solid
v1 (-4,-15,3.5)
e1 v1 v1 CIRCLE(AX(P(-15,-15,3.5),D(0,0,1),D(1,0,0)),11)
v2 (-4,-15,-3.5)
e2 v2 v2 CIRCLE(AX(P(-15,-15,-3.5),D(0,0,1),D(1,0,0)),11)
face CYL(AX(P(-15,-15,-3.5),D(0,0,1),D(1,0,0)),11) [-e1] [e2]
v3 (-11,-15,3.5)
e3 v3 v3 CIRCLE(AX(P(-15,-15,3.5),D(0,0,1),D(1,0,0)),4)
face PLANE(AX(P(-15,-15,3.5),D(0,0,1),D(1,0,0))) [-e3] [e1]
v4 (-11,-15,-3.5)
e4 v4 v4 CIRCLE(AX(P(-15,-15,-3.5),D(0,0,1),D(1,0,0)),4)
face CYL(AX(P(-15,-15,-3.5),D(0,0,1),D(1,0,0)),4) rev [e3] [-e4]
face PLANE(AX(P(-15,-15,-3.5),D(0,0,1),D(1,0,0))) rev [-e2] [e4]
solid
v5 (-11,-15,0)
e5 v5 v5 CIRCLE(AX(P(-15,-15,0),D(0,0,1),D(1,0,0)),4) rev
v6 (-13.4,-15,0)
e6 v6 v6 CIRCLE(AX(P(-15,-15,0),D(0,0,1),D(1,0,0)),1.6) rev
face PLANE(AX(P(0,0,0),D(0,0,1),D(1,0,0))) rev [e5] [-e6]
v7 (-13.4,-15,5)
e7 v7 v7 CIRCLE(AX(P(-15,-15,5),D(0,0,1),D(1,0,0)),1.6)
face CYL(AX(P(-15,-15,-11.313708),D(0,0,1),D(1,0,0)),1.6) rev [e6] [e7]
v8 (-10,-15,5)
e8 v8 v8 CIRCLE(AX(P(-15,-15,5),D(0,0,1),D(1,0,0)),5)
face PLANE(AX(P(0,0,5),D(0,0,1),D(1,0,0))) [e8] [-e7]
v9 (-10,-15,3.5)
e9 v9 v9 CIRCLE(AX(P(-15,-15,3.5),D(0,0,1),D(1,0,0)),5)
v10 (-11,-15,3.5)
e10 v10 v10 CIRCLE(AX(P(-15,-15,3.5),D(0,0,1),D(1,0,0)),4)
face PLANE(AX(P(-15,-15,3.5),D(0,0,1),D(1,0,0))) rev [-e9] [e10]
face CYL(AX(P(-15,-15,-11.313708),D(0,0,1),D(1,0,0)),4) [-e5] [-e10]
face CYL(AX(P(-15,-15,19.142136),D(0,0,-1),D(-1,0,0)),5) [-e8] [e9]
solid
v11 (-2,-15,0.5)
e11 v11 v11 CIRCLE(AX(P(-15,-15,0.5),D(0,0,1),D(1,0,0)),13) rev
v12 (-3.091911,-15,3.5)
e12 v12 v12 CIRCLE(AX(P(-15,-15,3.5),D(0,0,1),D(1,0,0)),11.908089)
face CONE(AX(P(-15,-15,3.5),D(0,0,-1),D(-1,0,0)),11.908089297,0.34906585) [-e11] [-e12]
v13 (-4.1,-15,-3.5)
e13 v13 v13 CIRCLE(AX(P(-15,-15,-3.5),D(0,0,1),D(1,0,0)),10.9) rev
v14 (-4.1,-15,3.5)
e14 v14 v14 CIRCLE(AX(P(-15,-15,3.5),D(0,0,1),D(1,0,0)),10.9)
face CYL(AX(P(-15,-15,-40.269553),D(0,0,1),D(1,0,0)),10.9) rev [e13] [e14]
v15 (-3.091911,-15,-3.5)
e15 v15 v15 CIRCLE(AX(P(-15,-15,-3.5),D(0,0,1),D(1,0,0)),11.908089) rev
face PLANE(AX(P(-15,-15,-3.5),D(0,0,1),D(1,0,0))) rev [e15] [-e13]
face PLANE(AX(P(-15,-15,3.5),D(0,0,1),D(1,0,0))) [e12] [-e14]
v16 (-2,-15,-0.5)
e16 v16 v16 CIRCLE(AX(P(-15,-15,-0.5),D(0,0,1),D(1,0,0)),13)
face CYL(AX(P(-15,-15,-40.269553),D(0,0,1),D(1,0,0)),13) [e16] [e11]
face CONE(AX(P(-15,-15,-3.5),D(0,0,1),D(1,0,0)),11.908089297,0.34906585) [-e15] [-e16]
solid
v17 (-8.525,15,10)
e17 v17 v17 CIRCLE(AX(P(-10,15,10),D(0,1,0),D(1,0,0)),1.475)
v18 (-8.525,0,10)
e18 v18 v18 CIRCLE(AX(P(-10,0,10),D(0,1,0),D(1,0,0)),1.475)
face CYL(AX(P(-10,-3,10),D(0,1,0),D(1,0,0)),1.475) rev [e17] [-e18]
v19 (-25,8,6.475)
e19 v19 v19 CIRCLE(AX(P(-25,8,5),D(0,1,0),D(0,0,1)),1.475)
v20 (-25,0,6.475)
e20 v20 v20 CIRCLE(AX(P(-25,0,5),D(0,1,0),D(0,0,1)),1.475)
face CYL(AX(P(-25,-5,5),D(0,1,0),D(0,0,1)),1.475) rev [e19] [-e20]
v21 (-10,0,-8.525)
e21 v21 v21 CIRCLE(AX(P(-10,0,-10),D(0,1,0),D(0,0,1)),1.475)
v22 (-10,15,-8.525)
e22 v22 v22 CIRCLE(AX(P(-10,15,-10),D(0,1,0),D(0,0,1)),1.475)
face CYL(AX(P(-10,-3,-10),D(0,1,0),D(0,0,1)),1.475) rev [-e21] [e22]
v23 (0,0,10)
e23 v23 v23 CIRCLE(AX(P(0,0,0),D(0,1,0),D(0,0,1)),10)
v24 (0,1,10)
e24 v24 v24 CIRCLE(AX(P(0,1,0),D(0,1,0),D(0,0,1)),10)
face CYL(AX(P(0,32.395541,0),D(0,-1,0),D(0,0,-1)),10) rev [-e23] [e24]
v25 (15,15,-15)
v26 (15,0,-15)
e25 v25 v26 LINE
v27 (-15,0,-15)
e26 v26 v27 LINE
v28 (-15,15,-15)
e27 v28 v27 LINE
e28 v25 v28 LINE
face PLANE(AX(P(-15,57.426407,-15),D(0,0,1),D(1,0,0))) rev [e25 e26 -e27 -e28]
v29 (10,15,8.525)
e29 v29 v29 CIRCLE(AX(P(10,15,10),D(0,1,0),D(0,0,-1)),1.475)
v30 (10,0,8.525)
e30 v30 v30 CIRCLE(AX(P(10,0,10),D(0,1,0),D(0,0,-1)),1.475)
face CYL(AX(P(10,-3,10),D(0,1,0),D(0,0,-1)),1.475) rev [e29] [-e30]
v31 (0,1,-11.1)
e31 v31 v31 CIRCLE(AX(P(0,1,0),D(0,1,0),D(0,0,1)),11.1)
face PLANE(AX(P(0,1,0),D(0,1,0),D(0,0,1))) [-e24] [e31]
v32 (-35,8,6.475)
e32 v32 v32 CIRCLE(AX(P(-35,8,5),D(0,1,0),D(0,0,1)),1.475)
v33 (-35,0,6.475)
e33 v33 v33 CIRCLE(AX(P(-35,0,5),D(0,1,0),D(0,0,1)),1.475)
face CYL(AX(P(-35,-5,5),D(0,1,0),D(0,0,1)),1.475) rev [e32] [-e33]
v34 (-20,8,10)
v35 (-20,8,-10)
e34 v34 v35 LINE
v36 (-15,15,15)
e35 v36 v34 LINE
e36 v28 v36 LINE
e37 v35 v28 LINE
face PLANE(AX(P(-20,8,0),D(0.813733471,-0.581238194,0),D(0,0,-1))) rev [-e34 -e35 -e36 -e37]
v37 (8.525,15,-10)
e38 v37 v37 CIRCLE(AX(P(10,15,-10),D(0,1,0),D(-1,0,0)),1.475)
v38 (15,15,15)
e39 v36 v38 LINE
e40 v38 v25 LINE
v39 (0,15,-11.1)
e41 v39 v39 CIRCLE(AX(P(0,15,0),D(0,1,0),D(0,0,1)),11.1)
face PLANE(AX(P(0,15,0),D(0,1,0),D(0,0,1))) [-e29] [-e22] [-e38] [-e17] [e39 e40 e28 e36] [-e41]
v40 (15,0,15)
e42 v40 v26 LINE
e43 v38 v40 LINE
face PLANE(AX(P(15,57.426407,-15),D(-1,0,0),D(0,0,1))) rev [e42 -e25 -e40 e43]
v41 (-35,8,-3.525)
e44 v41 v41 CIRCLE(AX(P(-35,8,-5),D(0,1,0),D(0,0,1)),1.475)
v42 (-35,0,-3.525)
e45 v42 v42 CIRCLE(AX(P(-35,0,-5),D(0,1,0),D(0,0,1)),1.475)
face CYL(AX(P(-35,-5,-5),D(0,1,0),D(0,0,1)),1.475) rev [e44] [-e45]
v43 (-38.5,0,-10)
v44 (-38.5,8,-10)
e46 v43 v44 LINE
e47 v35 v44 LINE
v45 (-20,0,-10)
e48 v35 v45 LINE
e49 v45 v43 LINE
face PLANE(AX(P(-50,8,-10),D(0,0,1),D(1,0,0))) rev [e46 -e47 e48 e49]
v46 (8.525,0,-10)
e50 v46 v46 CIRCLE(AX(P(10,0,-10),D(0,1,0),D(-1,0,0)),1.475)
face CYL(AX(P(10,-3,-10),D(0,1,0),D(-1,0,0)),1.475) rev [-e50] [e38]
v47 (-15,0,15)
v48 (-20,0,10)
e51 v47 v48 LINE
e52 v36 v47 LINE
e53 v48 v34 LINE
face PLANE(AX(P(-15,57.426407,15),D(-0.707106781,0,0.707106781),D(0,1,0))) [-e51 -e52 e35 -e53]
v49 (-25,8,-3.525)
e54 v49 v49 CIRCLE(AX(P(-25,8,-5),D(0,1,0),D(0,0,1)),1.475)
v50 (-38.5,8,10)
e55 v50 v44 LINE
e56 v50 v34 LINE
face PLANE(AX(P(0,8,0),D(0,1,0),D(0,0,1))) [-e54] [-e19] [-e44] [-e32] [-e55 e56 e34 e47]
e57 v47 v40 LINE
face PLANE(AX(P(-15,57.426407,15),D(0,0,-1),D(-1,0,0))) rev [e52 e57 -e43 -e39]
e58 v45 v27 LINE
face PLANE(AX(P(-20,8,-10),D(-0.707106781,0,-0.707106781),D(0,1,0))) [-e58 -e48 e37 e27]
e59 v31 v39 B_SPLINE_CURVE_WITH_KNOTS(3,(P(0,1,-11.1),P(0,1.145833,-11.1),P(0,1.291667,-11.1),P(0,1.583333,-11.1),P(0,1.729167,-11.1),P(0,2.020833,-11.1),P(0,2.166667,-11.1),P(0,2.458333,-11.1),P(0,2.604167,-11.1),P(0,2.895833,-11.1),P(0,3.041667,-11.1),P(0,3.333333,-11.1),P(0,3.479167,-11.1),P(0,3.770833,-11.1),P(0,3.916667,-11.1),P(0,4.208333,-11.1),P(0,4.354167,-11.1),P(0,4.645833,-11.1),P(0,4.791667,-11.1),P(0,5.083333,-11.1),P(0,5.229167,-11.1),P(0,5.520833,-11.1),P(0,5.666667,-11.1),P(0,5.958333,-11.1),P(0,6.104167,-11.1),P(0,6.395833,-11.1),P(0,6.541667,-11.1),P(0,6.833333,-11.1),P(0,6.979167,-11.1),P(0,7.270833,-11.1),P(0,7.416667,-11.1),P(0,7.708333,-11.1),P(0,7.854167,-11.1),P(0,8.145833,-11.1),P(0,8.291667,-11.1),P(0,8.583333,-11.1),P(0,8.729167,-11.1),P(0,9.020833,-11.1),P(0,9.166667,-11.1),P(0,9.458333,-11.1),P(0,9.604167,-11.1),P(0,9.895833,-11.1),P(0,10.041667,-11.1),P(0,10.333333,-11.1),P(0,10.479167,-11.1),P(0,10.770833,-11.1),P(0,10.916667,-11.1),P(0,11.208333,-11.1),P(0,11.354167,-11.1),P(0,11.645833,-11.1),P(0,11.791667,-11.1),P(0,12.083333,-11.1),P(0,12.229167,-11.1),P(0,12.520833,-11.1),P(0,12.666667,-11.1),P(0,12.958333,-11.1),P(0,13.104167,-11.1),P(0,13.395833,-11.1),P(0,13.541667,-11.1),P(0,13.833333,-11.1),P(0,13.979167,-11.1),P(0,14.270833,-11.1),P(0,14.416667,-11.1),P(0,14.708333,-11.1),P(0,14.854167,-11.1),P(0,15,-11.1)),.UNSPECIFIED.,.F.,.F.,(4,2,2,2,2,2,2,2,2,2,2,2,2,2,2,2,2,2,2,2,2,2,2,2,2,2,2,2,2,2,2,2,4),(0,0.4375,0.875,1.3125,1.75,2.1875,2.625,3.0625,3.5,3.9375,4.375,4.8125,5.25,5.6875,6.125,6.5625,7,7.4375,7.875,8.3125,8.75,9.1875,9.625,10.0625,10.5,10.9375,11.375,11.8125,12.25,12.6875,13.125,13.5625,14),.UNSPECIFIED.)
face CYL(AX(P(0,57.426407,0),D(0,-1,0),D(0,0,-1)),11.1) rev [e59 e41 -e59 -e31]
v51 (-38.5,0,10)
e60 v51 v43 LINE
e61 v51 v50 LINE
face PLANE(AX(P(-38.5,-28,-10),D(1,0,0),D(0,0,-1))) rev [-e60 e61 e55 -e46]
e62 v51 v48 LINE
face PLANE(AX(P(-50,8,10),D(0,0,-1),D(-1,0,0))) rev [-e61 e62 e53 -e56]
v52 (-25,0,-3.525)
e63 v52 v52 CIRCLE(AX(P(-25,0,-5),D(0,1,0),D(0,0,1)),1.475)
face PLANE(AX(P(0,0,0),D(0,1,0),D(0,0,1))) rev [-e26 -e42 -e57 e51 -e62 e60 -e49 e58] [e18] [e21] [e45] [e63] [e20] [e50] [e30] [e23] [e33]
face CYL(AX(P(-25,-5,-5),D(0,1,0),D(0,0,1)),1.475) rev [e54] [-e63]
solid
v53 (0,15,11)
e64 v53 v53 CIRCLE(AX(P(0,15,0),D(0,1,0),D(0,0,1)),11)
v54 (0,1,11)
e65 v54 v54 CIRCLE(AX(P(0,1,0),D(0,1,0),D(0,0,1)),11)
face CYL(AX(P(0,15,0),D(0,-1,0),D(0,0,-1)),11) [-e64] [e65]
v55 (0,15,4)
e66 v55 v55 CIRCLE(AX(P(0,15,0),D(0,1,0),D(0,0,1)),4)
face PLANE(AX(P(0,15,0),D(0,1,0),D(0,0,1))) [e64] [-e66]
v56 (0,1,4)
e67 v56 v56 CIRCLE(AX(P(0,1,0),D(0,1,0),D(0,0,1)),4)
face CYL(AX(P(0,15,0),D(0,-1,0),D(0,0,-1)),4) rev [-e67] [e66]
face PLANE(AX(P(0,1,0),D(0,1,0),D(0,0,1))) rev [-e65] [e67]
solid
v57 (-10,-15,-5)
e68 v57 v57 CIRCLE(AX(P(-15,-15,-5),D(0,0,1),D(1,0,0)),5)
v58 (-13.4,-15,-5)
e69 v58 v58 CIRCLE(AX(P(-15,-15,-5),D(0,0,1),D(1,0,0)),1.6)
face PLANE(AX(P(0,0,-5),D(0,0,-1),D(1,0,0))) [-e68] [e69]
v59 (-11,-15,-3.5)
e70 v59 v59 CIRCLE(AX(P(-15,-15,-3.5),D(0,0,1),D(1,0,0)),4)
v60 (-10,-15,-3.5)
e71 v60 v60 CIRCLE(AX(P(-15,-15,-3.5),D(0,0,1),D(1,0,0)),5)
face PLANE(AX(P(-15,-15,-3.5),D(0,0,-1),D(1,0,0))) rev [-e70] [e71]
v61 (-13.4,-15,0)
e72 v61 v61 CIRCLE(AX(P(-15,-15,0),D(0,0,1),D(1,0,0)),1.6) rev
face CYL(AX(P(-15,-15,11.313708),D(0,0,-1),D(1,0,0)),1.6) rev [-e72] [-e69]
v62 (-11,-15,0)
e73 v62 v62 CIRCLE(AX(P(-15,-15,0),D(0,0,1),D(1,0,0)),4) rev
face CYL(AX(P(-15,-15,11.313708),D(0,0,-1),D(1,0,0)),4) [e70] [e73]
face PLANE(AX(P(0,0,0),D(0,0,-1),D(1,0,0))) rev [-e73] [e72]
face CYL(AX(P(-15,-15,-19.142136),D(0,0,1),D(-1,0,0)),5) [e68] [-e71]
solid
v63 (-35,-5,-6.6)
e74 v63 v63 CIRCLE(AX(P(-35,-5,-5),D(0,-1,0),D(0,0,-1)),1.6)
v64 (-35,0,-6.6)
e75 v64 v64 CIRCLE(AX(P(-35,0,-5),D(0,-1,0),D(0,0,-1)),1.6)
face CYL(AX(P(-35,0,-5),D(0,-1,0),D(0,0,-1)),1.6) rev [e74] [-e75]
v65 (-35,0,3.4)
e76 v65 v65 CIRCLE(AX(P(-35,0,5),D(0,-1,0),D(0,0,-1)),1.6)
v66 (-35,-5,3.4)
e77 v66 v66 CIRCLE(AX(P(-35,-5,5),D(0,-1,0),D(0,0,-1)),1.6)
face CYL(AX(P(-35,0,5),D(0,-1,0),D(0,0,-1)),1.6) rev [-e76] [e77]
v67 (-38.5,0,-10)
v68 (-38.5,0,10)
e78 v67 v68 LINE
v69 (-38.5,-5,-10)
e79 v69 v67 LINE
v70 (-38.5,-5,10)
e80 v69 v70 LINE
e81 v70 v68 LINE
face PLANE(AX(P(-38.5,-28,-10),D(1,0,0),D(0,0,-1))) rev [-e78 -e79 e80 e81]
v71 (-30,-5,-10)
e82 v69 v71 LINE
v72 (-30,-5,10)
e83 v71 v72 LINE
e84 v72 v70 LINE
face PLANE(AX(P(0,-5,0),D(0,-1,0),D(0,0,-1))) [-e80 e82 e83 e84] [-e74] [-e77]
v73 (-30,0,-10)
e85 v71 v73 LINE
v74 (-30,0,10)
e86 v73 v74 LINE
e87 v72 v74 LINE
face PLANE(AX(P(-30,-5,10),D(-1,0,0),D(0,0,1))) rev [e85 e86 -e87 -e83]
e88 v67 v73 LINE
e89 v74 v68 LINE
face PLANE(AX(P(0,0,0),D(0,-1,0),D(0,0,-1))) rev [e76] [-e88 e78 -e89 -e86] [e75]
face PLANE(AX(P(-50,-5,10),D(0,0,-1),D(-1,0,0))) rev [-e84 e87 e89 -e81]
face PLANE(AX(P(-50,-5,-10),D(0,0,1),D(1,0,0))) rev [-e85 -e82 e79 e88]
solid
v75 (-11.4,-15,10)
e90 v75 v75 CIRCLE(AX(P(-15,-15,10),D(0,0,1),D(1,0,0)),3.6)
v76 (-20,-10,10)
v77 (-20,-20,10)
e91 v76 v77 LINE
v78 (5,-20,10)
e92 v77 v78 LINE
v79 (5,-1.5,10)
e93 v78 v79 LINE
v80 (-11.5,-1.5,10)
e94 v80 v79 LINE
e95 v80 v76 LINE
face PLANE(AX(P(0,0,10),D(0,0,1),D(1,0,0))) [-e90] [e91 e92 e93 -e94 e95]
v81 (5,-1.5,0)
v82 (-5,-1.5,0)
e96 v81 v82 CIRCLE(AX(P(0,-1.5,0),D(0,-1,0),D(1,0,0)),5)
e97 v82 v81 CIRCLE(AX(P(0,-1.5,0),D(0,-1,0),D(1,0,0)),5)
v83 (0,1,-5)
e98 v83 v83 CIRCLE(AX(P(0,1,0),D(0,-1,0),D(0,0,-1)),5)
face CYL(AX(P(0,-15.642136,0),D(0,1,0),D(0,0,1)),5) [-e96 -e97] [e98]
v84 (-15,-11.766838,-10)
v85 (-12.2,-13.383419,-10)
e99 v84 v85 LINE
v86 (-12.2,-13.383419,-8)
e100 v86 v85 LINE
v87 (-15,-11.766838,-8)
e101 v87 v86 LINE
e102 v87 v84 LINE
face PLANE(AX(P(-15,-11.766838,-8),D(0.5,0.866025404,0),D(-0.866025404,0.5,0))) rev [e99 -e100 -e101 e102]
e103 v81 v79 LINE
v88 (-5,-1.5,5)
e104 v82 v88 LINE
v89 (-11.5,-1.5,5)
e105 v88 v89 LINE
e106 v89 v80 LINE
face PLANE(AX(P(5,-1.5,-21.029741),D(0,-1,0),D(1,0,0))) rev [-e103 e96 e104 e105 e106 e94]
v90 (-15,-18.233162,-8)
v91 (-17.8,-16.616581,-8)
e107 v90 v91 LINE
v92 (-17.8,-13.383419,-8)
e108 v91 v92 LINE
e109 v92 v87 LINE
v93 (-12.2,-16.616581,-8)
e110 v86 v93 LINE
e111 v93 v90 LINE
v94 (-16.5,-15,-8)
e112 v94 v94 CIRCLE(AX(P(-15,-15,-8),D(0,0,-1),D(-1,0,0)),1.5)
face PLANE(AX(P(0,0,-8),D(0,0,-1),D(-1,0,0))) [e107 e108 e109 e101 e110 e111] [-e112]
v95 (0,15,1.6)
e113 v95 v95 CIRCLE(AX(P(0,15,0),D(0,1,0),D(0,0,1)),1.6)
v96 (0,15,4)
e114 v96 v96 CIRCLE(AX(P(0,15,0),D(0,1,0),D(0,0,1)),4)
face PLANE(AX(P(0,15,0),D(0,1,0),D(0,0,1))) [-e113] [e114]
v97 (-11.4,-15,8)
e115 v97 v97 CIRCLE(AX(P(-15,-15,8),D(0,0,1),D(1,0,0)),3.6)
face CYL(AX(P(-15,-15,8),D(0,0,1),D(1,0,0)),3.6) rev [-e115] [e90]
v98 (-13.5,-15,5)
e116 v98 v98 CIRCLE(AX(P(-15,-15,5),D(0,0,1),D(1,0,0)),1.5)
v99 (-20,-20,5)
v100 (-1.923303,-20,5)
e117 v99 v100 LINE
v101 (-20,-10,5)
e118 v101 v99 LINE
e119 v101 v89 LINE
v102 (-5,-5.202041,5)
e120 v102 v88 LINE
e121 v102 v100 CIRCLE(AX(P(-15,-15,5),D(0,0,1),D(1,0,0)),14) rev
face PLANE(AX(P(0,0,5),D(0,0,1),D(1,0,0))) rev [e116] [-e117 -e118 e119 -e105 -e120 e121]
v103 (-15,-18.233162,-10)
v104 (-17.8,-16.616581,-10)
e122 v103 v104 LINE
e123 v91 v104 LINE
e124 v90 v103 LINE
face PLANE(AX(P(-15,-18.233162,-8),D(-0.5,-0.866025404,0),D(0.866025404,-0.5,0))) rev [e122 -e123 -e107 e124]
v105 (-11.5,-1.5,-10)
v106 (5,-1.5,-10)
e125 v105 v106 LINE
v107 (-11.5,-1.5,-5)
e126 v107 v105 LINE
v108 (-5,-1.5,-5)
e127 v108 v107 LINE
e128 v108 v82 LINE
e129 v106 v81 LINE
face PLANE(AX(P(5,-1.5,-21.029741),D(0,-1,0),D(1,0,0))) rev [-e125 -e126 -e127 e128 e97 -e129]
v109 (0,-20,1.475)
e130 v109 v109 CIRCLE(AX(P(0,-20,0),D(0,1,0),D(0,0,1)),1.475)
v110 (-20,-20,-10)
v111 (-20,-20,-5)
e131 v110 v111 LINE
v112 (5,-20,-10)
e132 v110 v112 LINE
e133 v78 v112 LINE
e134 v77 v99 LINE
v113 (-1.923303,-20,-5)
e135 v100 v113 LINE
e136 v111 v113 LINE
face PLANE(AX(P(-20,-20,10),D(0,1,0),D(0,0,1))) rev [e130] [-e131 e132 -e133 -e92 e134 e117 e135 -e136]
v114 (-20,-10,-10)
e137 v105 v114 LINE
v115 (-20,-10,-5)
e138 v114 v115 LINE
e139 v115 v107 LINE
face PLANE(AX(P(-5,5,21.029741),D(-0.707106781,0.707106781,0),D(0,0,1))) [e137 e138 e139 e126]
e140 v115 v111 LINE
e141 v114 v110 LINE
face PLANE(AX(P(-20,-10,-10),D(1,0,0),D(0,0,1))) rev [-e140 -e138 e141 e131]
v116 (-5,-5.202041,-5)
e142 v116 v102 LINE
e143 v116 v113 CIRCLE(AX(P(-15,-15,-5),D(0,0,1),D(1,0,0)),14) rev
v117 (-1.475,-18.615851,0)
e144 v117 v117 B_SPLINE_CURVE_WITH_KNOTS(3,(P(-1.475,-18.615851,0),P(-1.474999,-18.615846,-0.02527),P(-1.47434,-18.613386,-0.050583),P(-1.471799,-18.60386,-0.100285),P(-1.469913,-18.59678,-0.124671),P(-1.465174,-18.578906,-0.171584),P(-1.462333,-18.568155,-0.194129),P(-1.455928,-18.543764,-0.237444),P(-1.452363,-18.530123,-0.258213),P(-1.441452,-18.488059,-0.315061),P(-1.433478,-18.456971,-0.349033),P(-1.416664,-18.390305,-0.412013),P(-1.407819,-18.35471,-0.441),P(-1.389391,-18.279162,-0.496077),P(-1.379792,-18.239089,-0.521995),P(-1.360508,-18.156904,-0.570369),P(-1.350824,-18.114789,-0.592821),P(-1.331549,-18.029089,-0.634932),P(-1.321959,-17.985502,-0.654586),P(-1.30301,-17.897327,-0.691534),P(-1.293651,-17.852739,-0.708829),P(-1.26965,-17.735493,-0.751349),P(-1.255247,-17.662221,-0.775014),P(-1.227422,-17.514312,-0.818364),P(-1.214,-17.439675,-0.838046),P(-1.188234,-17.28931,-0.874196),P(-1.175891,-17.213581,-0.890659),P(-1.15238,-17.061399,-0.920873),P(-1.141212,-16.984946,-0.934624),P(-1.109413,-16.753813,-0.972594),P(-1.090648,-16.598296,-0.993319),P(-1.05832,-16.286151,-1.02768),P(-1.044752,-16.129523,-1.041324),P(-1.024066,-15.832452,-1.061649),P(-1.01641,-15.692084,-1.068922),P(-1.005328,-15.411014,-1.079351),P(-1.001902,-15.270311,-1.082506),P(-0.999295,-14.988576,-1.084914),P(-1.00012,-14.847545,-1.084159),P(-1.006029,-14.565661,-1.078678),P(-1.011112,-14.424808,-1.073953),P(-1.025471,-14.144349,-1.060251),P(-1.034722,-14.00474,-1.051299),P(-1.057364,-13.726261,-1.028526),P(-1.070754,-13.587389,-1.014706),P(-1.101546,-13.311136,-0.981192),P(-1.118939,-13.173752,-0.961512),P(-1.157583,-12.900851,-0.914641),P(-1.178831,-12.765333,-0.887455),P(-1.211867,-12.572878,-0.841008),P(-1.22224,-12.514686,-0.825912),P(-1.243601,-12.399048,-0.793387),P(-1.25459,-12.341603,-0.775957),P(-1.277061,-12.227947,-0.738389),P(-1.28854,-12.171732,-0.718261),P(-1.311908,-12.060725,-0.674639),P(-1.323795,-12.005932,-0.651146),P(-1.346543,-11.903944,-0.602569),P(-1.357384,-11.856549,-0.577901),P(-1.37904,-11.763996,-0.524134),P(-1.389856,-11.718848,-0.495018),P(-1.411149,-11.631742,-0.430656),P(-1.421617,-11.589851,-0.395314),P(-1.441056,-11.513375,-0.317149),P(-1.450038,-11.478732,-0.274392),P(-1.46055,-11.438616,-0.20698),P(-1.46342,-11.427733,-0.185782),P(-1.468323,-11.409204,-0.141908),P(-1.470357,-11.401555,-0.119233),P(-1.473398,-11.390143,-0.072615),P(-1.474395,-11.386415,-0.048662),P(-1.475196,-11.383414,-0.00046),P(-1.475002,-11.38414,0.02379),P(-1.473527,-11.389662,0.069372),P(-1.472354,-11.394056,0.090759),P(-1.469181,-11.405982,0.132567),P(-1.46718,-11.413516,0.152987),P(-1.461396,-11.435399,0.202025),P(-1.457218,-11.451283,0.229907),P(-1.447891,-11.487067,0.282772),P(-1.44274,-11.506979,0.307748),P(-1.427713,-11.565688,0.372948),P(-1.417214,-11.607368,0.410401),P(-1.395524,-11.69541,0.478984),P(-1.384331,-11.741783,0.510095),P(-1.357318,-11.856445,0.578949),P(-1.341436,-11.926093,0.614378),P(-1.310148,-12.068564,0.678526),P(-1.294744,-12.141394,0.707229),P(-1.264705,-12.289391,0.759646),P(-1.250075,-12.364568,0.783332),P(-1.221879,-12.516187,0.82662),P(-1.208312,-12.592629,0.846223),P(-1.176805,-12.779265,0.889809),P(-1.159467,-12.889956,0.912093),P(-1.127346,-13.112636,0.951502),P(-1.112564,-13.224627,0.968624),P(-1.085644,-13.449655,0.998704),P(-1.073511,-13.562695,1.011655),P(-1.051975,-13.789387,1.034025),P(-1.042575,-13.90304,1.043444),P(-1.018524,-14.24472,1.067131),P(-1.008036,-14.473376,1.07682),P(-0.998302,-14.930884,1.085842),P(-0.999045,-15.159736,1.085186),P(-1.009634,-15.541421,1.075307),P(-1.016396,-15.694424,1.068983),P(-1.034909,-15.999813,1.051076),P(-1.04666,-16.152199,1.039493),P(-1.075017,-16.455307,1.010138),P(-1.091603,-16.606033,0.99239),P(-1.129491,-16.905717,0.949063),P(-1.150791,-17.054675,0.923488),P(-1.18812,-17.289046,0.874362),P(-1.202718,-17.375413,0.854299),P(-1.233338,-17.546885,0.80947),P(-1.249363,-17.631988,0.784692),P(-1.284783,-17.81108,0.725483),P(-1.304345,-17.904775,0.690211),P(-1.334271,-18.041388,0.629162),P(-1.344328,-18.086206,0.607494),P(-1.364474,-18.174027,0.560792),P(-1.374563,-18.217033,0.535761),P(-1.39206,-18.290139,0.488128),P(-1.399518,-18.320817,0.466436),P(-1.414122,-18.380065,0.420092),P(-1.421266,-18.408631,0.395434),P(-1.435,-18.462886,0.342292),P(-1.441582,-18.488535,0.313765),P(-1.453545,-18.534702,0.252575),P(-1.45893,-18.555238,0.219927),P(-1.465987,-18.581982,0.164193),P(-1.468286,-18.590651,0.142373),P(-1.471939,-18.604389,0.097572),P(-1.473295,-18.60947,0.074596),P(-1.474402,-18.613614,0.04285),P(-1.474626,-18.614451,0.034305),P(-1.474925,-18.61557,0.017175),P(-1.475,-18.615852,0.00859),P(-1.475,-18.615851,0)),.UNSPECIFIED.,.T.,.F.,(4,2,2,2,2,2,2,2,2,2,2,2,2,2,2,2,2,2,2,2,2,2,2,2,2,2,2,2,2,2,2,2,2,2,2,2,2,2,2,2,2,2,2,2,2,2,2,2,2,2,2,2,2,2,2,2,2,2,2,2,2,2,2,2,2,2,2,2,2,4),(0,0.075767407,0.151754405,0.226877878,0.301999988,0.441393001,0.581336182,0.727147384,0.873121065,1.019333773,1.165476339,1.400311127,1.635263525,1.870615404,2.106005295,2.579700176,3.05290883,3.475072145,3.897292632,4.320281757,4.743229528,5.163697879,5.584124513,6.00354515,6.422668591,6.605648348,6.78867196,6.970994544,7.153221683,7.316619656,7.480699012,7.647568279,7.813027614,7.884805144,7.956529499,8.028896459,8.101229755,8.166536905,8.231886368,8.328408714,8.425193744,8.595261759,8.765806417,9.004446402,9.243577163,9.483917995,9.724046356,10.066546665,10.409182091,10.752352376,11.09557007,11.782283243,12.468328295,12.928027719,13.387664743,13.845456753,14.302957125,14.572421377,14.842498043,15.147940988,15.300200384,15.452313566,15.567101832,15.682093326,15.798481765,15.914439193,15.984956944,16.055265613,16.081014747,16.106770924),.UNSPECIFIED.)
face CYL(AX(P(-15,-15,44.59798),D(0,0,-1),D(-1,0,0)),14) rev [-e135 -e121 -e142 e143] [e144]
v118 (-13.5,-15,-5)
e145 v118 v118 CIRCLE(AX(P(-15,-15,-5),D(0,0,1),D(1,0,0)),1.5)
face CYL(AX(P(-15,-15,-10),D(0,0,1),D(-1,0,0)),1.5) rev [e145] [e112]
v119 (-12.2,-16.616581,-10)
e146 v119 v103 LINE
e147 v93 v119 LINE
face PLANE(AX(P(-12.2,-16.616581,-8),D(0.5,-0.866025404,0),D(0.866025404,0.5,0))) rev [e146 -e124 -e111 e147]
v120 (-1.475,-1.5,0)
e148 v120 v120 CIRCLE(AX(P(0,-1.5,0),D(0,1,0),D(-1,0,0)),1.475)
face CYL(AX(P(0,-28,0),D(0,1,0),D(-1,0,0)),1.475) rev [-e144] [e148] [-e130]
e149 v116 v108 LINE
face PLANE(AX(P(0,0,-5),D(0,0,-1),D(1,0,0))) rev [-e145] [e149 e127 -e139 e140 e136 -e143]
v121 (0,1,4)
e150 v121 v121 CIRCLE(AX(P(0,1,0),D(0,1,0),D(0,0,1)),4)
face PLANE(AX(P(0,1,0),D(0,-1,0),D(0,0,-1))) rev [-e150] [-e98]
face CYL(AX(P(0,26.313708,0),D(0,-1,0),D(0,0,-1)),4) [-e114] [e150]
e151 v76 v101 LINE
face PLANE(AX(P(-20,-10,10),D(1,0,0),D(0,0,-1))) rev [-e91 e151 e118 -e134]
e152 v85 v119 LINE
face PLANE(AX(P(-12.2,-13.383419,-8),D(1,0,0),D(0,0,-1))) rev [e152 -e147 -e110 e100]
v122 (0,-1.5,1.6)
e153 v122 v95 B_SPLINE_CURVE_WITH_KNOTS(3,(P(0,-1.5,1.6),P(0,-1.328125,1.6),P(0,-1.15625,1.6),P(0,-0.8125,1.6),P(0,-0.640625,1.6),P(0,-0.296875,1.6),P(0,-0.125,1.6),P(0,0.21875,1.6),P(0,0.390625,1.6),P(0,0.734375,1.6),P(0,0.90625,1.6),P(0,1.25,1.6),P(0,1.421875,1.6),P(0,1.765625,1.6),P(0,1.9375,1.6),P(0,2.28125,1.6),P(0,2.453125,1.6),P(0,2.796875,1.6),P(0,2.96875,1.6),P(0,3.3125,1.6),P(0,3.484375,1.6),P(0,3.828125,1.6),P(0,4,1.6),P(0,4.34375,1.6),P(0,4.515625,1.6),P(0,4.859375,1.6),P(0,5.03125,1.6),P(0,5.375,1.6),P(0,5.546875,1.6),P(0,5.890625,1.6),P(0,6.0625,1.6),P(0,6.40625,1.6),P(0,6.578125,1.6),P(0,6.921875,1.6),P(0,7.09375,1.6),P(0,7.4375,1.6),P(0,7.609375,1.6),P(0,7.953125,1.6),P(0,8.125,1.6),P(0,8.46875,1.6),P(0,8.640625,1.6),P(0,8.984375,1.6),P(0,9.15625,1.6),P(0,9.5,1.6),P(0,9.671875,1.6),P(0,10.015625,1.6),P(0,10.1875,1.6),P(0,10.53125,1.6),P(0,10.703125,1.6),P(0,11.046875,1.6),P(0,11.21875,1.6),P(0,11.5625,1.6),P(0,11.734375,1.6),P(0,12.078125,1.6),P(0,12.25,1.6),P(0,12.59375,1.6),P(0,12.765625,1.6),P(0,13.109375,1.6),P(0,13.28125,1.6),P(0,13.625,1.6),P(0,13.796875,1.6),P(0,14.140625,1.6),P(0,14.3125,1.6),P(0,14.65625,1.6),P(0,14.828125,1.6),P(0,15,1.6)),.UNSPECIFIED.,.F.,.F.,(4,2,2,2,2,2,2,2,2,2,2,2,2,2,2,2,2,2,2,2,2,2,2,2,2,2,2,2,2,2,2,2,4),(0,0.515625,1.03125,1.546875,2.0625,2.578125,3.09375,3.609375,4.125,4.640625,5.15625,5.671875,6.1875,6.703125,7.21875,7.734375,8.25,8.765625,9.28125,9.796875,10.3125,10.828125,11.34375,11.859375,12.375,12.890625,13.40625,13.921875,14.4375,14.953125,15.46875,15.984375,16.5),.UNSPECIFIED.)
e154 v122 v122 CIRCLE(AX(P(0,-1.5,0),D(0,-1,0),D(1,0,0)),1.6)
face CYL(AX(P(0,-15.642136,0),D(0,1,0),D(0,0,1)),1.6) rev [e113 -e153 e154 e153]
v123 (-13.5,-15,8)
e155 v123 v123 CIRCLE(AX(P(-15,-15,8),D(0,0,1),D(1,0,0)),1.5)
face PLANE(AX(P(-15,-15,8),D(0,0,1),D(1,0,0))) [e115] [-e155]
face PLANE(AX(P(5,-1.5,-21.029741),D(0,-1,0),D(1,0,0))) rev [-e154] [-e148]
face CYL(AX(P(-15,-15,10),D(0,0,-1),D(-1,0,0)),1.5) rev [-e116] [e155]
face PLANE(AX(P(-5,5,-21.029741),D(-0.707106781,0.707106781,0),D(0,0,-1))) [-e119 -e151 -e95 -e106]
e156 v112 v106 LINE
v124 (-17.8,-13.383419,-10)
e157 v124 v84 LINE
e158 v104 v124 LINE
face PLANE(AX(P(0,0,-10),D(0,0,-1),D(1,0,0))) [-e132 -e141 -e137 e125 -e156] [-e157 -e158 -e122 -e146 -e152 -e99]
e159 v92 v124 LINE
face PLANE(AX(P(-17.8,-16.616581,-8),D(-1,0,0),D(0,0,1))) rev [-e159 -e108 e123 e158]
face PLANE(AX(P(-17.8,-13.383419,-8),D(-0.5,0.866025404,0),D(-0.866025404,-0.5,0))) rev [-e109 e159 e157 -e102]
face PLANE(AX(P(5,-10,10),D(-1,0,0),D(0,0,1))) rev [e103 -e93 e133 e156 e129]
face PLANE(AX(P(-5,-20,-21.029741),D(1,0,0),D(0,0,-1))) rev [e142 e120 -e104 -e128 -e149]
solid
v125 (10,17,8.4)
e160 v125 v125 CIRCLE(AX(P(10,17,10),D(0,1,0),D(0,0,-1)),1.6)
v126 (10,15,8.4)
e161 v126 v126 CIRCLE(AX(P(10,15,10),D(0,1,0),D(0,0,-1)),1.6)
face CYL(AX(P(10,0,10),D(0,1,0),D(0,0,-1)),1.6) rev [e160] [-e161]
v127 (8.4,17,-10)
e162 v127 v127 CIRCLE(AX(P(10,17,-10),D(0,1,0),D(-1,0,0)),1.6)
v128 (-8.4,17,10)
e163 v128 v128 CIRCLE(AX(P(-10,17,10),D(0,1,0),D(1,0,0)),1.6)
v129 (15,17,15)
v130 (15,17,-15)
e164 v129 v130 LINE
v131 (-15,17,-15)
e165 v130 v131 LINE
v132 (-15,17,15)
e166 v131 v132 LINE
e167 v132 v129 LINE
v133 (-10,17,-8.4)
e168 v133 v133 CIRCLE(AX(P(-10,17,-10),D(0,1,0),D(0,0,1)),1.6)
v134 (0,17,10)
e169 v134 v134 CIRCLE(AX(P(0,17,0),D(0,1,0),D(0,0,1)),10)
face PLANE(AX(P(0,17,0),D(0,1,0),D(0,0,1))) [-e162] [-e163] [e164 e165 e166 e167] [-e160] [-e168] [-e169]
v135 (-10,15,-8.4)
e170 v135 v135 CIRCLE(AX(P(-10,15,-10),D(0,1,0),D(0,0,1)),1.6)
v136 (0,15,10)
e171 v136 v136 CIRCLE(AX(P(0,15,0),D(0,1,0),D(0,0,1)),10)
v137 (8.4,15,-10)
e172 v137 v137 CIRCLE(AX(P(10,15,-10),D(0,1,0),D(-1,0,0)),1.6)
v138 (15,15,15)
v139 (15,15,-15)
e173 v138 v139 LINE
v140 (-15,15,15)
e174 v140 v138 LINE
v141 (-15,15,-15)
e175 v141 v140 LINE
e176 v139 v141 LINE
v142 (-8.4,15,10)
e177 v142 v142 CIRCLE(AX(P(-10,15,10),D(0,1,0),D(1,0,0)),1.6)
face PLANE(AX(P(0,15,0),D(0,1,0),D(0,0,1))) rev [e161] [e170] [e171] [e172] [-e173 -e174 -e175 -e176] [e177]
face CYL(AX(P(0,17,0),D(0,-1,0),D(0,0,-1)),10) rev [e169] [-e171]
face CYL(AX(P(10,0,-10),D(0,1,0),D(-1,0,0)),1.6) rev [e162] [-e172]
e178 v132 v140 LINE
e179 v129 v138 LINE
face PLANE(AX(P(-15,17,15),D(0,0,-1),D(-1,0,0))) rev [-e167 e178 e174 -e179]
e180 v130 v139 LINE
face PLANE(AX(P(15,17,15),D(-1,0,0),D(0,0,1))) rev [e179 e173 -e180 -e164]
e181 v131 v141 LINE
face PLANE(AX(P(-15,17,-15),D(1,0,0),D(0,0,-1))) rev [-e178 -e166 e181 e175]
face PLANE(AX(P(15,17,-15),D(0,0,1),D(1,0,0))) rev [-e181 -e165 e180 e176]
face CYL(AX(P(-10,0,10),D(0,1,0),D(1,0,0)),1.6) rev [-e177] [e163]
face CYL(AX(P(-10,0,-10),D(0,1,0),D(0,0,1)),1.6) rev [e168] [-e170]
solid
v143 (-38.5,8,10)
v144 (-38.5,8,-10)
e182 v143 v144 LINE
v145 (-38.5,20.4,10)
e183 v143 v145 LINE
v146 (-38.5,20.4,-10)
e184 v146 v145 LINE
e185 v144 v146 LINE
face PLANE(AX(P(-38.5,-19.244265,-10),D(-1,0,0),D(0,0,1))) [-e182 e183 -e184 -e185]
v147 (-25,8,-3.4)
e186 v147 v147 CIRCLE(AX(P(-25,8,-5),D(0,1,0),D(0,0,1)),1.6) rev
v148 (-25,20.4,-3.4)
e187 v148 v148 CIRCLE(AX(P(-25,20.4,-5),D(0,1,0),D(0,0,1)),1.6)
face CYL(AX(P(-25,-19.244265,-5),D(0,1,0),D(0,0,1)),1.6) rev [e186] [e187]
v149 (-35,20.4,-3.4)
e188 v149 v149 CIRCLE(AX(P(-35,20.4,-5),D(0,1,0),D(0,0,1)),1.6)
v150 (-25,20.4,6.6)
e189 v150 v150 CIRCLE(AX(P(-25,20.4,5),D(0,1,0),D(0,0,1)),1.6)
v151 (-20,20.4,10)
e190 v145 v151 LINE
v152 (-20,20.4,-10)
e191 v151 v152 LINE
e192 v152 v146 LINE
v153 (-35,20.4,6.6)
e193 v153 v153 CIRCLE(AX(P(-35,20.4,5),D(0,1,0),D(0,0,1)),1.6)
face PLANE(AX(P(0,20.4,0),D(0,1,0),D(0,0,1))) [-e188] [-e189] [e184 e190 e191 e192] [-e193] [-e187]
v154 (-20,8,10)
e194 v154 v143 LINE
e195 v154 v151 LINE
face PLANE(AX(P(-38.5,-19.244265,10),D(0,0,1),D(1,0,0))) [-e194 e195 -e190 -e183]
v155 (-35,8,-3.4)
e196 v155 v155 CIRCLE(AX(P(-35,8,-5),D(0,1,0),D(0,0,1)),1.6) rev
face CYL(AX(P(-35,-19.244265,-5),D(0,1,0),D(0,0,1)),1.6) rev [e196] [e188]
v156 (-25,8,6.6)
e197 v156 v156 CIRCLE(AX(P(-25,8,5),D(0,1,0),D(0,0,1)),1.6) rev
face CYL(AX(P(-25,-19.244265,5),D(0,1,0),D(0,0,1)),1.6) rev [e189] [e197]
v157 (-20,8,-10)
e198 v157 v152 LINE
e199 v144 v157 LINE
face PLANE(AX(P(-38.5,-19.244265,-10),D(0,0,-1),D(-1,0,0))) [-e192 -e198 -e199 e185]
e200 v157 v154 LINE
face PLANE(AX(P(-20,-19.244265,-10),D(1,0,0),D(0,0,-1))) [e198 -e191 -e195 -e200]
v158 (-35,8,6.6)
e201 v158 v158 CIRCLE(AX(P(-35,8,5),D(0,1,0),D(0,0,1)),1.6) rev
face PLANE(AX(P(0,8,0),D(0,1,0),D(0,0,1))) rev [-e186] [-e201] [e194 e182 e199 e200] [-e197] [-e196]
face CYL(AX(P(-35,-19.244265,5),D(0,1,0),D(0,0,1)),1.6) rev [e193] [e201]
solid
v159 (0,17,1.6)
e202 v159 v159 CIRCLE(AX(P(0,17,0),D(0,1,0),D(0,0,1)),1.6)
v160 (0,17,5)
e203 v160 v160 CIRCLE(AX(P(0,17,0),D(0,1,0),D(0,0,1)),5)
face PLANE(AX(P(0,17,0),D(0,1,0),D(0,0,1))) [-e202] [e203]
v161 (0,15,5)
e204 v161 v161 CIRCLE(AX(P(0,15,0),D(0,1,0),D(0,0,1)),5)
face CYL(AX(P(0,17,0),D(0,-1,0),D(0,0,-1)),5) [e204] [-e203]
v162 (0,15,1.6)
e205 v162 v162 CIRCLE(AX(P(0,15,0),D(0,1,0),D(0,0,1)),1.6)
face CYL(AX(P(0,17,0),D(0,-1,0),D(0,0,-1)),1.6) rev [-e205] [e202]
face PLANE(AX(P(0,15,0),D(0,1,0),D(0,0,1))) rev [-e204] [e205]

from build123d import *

# Parameters (mm, degrees)
BOSS_EXTRUDE1_START       = 1
SKETCH1_R                 = 11
SKETCH1_R_2               = 4
BOSS_EXTRUDE1_DEPTH       = 14
SKETCH2_W                 = 30
SKETCH2_H                 = 30
SKETCH2_R                 = 11.1
BOSS_EXTRUDE2_DEPTH       = 15
SKETCH22_R                = 11.1
SKETCH22_R_2              = 10
BOSS_EXTRUDE14_DEPTH      = 1
SKETCH23_W                = 30
SKETCH23_H                = 30
SKETCH23_R                = 10
BOSS_EXTRUDE15_DEPTH      = 2
SKETCH24_R                = 1.475
CUT_EXTRUDE7_DEPTH        = 20
SKETCH25_R                = 1.6
CUT_EXTRUDE8_DEPTH        = 28.184554438
CIRPATTERN1_OUTLINE_R     = 1.475
CIRPATTERN1_DEPTH         = 17
CIRPATTERN1_START         = 15
CIRPATTERN1_2_OUTLINE_R   = 1.6
CIRPATTERN1_2_OUTLINE_R_2 = 1.475
CIRPATTERN1_2_DEPTH       = 2
SKETCH4_W                 = 35
SKETCH4_H                 = 20
BOSS_EXTRUDE4_DEPTH       = 8
SKETCH28_W                = 20
SKETCH28_H                = 20
BOSS_EXTRUDE16_DEPTH      = 5
SKETCH19_R                = 1.475
CUT_EXTRUDE5_DEPTH        = 54.795910625
SKETCH30_R                = 1.6
CUT_EXTRUDE11_DEPTH       = 5
LPATTERN1_COUNT           = 3
LPATTERN1_PITCH           = 10
LPATTERN1_COUNT_DIR2      = 2
LPATTERN1_PITCH_DIR2      = 10
LPATTERN2_COUNT           = 2
LPATTERN2_PITCH           = 10
LPATTERN2_COUNT_DIR2      = 2
LPATTERN2_PITCH_DIR2      = 10
CHAMFER4_SIZE             = 5
CHAMFER5_SIZE2            = 5
CHAMFER5_SIZE             = 7
BOSS_EXTRUDE8_START       = 1
SKETCH9_R                 = 4
SKETCH9_R_2               = 1.6
BOSS_EXTRUDE8_DEPTH       = 14
BOSS_EXTRUDE5_DEPTH       = 3.5
BOSS_EXTRUDE5_DEPTH_BACK  = 3.5
SKETCH5_R                 = 11
SKETCH5_R_2               = 4
SKETCH6_R                 = 13
SKETCH6_R_2               = 10.9
BOSS_EXTRUDE6_DEPTH       = 7
CHAMFER1_SIZE             = 3
CHAMFER1_SIZE2            = 1.091910703
SKETCH7_R                 = 4
SKETCH7_R_2               = 1.6
BOSS_EXTRUDE7_DEPTH       = 3.5
BOSS_EXTRUDE9_START       = 5
SKETCH10_W                = 25
SKETCH10_H                = 10
SKETCH10_R                = 1.5
BOSS_EXTRUDE9_DEPTH       = 5
SKETCH12_R                = 5
SKETCH12_R_2              = 1.6
BOSS_EXTRUDE10_DEPTH      = 1.5
BOSS_EXTRUDE11_DEPTH      = 5
BOSS_EXTRUDE11_DEPTH_BACK = 5
SKETCH13_W                = 10
SKETCH13_H                = 18.5
CHAMFER2_SIZE             = 15
SKETCH14_R                = 14
CUT_EXTRUDE1_DEPTH        = 5
SKETCH16_R                = 1.475
CUT_EXTRUDE2_DEPTH        = 59.542719445
SKETCH15_R                = 5
SKETCH15_R_2              = 1.6
BOSS_EXTRUDE12_DEPTH      = 2.5
SKETCH17_R                = 3.6
CUT_EXTRUDE3_DEPTH        = 2
CUT_EXTRUDE4_DEPTH        = 2
SKETCH21_R                = 5
SKETCH21_R_2              = 1.6
BOSS_EXTRUDE13_DEPTH      = 2
SKETCH29_W                = 10
SKETCH29_H                = 20
CUT_EXTRUDE10_DEPTH       = 64.41135545
SKETCH31_W                = 1.5
SKETCH31_H                = 20
CUT_EXTRUDE12_DEPTH       = 61.613529843
BOSS_EXTRUDE17_DEPTH      = 5.4
BOSS_EXTRUDE17_DEPTH_BACK = 7
SKETCH32_W                = 18.5
SKETCH32_H                = 20
SKETCH32_R                = 1.6


# Read off the part's stored shape, not the designer's step: CirPattern1
# Some blends are built 0.0001 mm under size
with BuildPart() as part:
    # Sketch1 → Boss-Extrude1 (new body)
    with BuildSketch(Plane(origin=(0, 0, 0), x_dir=(1, 0, 0), z_dir=(0, 1, 0)).offset(BOSS_EXTRUDE1_START)):
        with Locations(Location((0, 0, 0), (0, 0, 270))):
            Circle(SKETCH1_R)
        with Locations(Location((0, 0, 0), (0, 0, 270))):
            Circle(SKETCH1_R_2, mode=Mode.SUBTRACT)
    extrude(amount=BOSS_EXTRUDE1_DEPTH)


with BuildPart() as body_2:
    # Sketch2 → Boss-Extrude2 (new body)
    with BuildSketch(Plane(origin=(0, 0, 0), x_dir=(1, 0, 0), z_dir=(0, 1, 0))):
        Rectangle(SKETCH2_W, SKETCH2_H)
        with Locations(Location((0, 0, 0), (0, 0, 90))):
            Circle(SKETCH2_R, mode=Mode.SUBTRACT)
    extrude(amount=BOSS_EXTRUDE2_DEPTH)

    # Sketch22 → Boss-Extrude14 (add)
    with BuildSketch(Plane(origin=(0, 0, 0), x_dir=(1, 0, 0), z_dir=(0, 1, 0))):
        with Locations(Location((0, 0, 0), (0, 0, 90))):
            Circle(SKETCH22_R)
        with Locations(Location((0, 0, 0), (0, 0, 270))):
            Circle(SKETCH22_R_2, mode=Mode.SUBTRACT)
    extrude(amount=BOSS_EXTRUDE14_DEPTH)


with BuildPart() as body_3:
    # Sketch23 → Boss-Extrude15 (new body)
    with BuildSketch(Plane(origin=(0, 15, 0), x_dir=(1, 0, 0), z_dir=(0, 1, 0))):
        Rectangle(SKETCH23_W, SKETCH23_H)
        with Locations(Location((0, 0, 0), (0, 0, 270))):
            Circle(SKETCH23_R, mode=Mode.SUBTRACT)
    extrude(amount=BOSS_EXTRUDE15_DEPTH)


with BuildPart() as cut_extrude7_tool:
    # Sketch24 → Cut-Extrude7 (new body)
    with BuildSketch(Plane(origin=(0, 17, 0), x_dir=(1, 0, 0), z_dir=(0, 1, 0))):
        with Locations(Location((-10, 10, 0), (0, 0, 270))):
            Circle(SKETCH24_R)
    extrude(amount=-CUT_EXTRUDE7_DEPTH)


with BuildPart() as body_2_1:
    add(body_2.part)

    # Cut-Extrude7: cut by cut_extrude7_tool
    add(cut_extrude7_tool.part, mode=Mode.SUBTRACT)


with BuildPart() as body_3_1:
    add(body_3.part)

    # Cut-Extrude7: cut by cut_extrude7_tool
    add(cut_extrude7_tool.part, mode=Mode.SUBTRACT)

    # Sketch25 → Cut-Extrude8 (cut, through all)
    with BuildSketch(Plane(origin=(0, 17, 0), x_dir=(1, 0, 0), z_dir=(0, 1, 0))):
        with Locations(Location((-10, 10, 0), (0, 0, 270))):
            Circle(SKETCH25_R)
    extrude(amount=-CUT_EXTRUDE8_DEPTH, mode=Mode.SUBTRACT)


with BuildPart() as cirpattern1_tool:
    # CirPattern1 outline → CirPattern1 (new body)
    with BuildSketch(Plane(origin=(0, 0, 0), x_dir=(1, 0, 0), z_dir=(0, 1, 0))):
        with Locations((-10, -10)):
            Circle(CIRPATTERN1_OUTLINE_R)
        with Locations((10, -10)):
            Circle(CIRPATTERN1_OUTLINE_R)
        with Locations((10, 10)):
            Circle(CIRPATTERN1_OUTLINE_R)
    extrude(amount=CIRPATTERN1_DEPTH)


with BuildPart() as body_2_2:
    add(body_2_1.part)

    # CirPattern1: cut by cirpattern1_tool
    add(cirpattern1_tool.part, mode=Mode.SUBTRACT)

    # Sketch4 → Boss-Extrude4 (add)
    with BuildSketch(Plane(origin=(0, 0, 0), x_dir=(1, 0, 0), z_dir=(0, 1, 0))):
        with Locations((-32.5, 0)):
            Rectangle(SKETCH4_W, SKETCH4_H)
    extrude(amount=BOSS_EXTRUDE4_DEPTH)


with BuildPart() as body_3_2:
    add(body_3_1.part)

    # CirPattern1: cut by cirpattern1_tool
    add(cirpattern1_tool.part, mode=Mode.SUBTRACT)

    # CirPattern1 2 outline → CirPattern1 2 (cut)
    # profile 1 of 3: a face of its own
    with BuildSketch(Plane(origin=(0, 0, 0), x_dir=(1, 0, 0), z_dir=(0, 1, 0)).offset(CIRPATTERN1_START)):
        with Locations((-10, -10)):
            Circle(CIRPATTERN1_2_OUTLINE_R)
        with Locations((-10, -10)):
            Circle(CIRPATTERN1_2_OUTLINE_R_2, mode=Mode.SUBTRACT)
    # profile 2 of 3: a face of its own
    with BuildSketch(Plane(origin=(0, 0, 0), x_dir=(1, 0, 0), z_dir=(0, 1, 0)).offset(CIRPATTERN1_START)):
        with Locations((10, -10)):
            Circle(CIRPATTERN1_2_OUTLINE_R)
        with Locations((10, -10)):
            Circle(CIRPATTERN1_2_OUTLINE_R_2, mode=Mode.SUBTRACT)
    # profile 3 of 3: a face of its own
    with BuildSketch(Plane(origin=(0, 0, 0), x_dir=(1, 0, 0), z_dir=(0, 1, 0)).offset(CIRPATTERN1_START)):
        with Locations((10, 10)):
            Circle(CIRPATTERN1_2_OUTLINE_R)
        with Locations((10, 10)):
            Circle(CIRPATTERN1_2_OUTLINE_R_2, mode=Mode.SUBTRACT)
    extrude(amount=CIRPATTERN1_2_DEPTH, mode=Mode.SUBTRACT)


with BuildPart() as body_4:
    # Sketch28 → Boss-Extrude16 (new body)
    with BuildSketch(Plane.XZ):
        with Locations((-40, 0)):
            Rectangle(SKETCH28_W, SKETCH28_H)
    extrude(amount=BOSS_EXTRUDE16_DEPTH)


with BuildPart() as cut_extrude5_tool:
    # Sketch19 → Cut-Extrude5 (new, through all)
    with BuildSketch(Plane(origin=(0, 8, 0), x_dir=(1, 0, 0), z_dir=(0, 1, 0))):
        with Locations(Location((-45, 5, 0), (0, 0, 270))):
            Circle(SKETCH19_R)
    cut_extrude5 = extrude(amount=-CUT_EXTRUDE5_DEPTH)


with BuildPart() as body_2_3:
    add(body_2_2.part)

    # Cut-Extrude5: cut by cut_extrude5_tool
    add(cut_extrude5_tool.part, mode=Mode.SUBTRACT)


with BuildPart() as body_4_1:
    add(body_4.part)

    # Cut-Extrude5: cut by cut_extrude5_tool
    add(cut_extrude5_tool.part, mode=Mode.SUBTRACT)

    # Sketch30 → Cut-Extrude11 (cut)
    with BuildSketch(Plane.XZ.offset(5)):
        with Locations(Location((-45, -5, 0), (0, 0, 270))):
            Circle(SKETCH30_R)
    cut_extrude11 = extrude(amount=-CUT_EXTRUDE11_DEPTH, mode=Mode.SUBTRACT)


with BuildPart() as lpattern1_tool:
    # LPattern1: Cut-Extrude5 3 × 2
    with Locations(*[(i * LPATTERN1_PITCH, 0, j * LPATTERN1_PITCH_DIR2) for i in range(LPATTERN1_COUNT) for j in range(LPATTERN1_COUNT_DIR2) if (i, j) != (0, 0)]):
        add(cut_extrude5)


with BuildPart() as body_2_4:
    add(body_2_3.part)

    # LPattern1: cut by lpattern1_tool
    add(lpattern1_tool.part, mode=Mode.SUBTRACT)

    # Chamfer4
    chamfer4_edges = [body_2_4.edges().sort_by_distance(p)[0] for p in [
        (-15, 4, -10),
        (-15, 4, 10),
    ]]
    chamfer(chamfer4_edges, length=CHAMFER4_SIZE - 0.0001)  # a hair under: the kernel refuses the full size

    # Chamfer5
    chamfer5_edges = [body_2_4.edges().sort_by_distance(p)[0] for p in [
        (-15, 8, 0),
    ]]
    chamfer5_side = [body_2_4.faces().sort_by_distance(p)[0] for p in [
        (-15, 8.1, 0),
    ]]
    chamfer(chamfer5_edges, length=CHAMFER5_SIZE - 0.0001, length2=CHAMFER5_SIZE2 - 0.0001, reference=chamfer5_side[0])  # a hair under: the kernel refuses the full size


with BuildPart() as body_4_2:
    add(body_4_1.part)

    # LPattern1: cut by lpattern1_tool
    add(lpattern1_tool.part, mode=Mode.SUBTRACT)

    # LPattern2: Cut-Extrude11 2 × 2
    with Locations(*[(i * LPATTERN2_PITCH, 0, j * LPATTERN2_PITCH_DIR2) for i in range(LPATTERN2_COUNT) for j in range(LPATTERN2_COUNT_DIR2) if (i, j) != (0, 0)]):
        add(cut_extrude11, mode=Mode.SUBTRACT)


with BuildPart() as body_5:
    # Sketch9 → Boss-Extrude8 (new body)
    with BuildSketch(Plane(origin=(0, 0, 0), x_dir=(1, 0, 0), z_dir=(0, 1, 0)).offset(BOSS_EXTRUDE8_START)):
        with Locations(Location((0, 0, 0), (0, 0, 270))):
            Circle(SKETCH9_R)
        with Locations(Location((0, 0, 0), (0, 0, 270))):
            Circle(SKETCH9_R_2, mode=Mode.SUBTRACT)
    extrude(amount=BOSS_EXTRUDE8_DEPTH)


with BuildPart() as body_6:
    # Sketch5 → Boss-Extrude5 (new, two sides: drawn at the far end of the back side and taken through both)
    with BuildSketch(Plane.XY.offset(-BOSS_EXTRUDE5_DEPTH_BACK)):
        with Locations((-15, -15)):
            Circle(SKETCH5_R)
        with Locations((-15, -15)):
            Circle(SKETCH5_R_2, mode=Mode.SUBTRACT)
    extrude(amount=BOSS_EXTRUDE5_DEPTH + BOSS_EXTRUDE5_DEPTH_BACK)


with BuildPart() as body_7:
    # Sketch6 → Boss-Extrude6 (new body)
    with BuildSketch(Plane.XY.offset(3.5)):
        with Locations((-15, -15)):
            Circle(SKETCH6_R)
        with Locations((-15, -15)):
            Circle(SKETCH6_R_2, mode=Mode.SUBTRACT)
    extrude(amount=-BOSS_EXTRUDE6_DEPTH)

    # Chamfer1
    chamfer1_edges = [body_7.edges().sort_by_distance(p)[0] for p in [
        (-28, -15, 3.5),
        (-28, -15, -3.5),
    ]]
    chamfer1_side = [body_7.faces().sort_by_distance(p)[0] for p in [
        (-28, -15, 0),
    ]]
    chamfer(chamfer1_edges, length=CHAMFER1_SIZE, length2=CHAMFER1_SIZE2, reference=chamfer1_side[0])


with BuildPart() as body_8:
    # Sketch7 → Boss-Extrude7 (new body)
    with BuildSketch(Plane.XY.offset(3.5)):
        with Locations((-15, -15)):
            Circle(SKETCH7_R)
        with Locations((-15, -15)):
            Circle(SKETCH7_R_2, mode=Mode.SUBTRACT)
    extrude(amount=-BOSS_EXTRUDE7_DEPTH)

    # Sketch12 → Boss-Extrude10 (add)
    with BuildSketch(Plane.XY.offset(3.5)):
        with Locations((-15, -15)):
            Circle(SKETCH12_R)
        with Locations((-15, -15)):
            Circle(SKETCH12_R_2, mode=Mode.SUBTRACT)
    extrude(amount=BOSS_EXTRUDE10_DEPTH)


with BuildPart() as body_9:
    # Sketch10 → Boss-Extrude9 (new body)
    with BuildSketch(Plane.XY.offset(BOSS_EXTRUDE9_START)):
        with Locations((-7.5, -15)):
            Rectangle(SKETCH10_W, SKETCH10_H)
        with Locations((-15, -15)):
            Circle(SKETCH10_R, mode=Mode.SUBTRACT)
    extrude(amount=BOSS_EXTRUDE9_DEPTH)

    # Sketch13 → Boss-Extrude11 (add, two sides: drawn at the far end of the back side and taken through both)
    with BuildSketch(Plane(origin=(0, 0, 5), x_dir=(-1, 0, 0), z_dir=(0, 0, -1)).offset(-BOSS_EXTRUDE11_DEPTH_BACK)):
        with Locations((0, -10.75)):
            Rectangle(SKETCH13_W, SKETCH13_H)
    extrude(amount=BOSS_EXTRUDE11_DEPTH + BOSS_EXTRUDE11_DEPTH_BACK)

    # Chamfer2
    # the kernel refuses this chamfer: 15 mm, written as the material it adds along each edge
    with BuildSketch(Plane(origin=(-5, -10, 10), x_dir=(-0.9996219169112968, -0.02749587661058632, 0), z_dir=(0, 0, -1))) as chamfer2_piece_1_section:
        Polygon((CHAMFER2_SIZE * 0.999621916911, CHAMFER2_SIZE * 0.0274958766106), (-CHAMFER2_SIZE * 0.0274958766106, CHAMFER2_SIZE * 0.999621916911), (0, 0), align=None)
    chamfer2_piece_1 = extrude(amount=5, mode=Mode.PRIVATE)
    chamfer2_piece_1 = split(chamfer2_piece_1, bisect_by=Plane(origin=(-20, -6.510199525, 7.5), z_dir=(1, 0, 0)), keep=Keep.TOP, mode=Mode.PRIVATE)
    chamfer2_piece_1 = split(chamfer2_piece_1, bisect_by=Plane(origin=(-10.693374649, -1.5, 7.5), z_dir=(0, -1, 0)), keep=Keep.TOP, mode=Mode.PRIVATE)
    add(chamfer2_piece_1)

    # Sketch14 → Cut-Extrude1 (cut)
    with BuildSketch(Plane(origin=(0, 0, 0), x_dir=(-1, 0, 0), z_dir=(0, 0, -1))):
        with Locations((15, -15)):
            Circle(SKETCH14_R)
    extrude(amount=-CUT_EXTRUDE1_DEPTH, mode=Mode.SUBTRACT)

    # Mirror1: body 9 across plane


with BuildPart() as body_9_1:
    add(body_9.part)
    add(body_9.part.mirror(Plane.XY))

    # Sketch16 → Cut-Extrude2 (cut, through all)
    with BuildSketch(Plane(origin=(0, -1.5, 0), x_dir=(1, 0, 0), z_dir=(0, 1, 0))):
        with Locations(Location((0, 0, 0), (0, 0, 180))):
            Circle(SKETCH16_R)
    extrude(amount=-CUT_EXTRUDE2_DEPTH, mode=Mode.SUBTRACT)

    # Sketch17 → Cut-Extrude3 (cut)
    with BuildSketch(Plane.XY.offset(10)):
        with Locations((-15, -15)):
            Circle(SKETCH17_R)
    extrude(amount=-CUT_EXTRUDE3_DEPTH, mode=Mode.SUBTRACT)

    # Sketch18 → Cut-Extrude4 (cut)
    with BuildSketch(Plane(origin=(0, 0, -10), x_dir=(-1, 0, 0), z_dir=(0, 0, -1))):
        Polygon((12.2, -16.616580754), (15, -18.233161507), (17.8, -16.616580754), (17.8, -13.383419246), (15, -11.766838493), (12.2, -13.383419246), align=None)
    extrude(amount=-CUT_EXTRUDE4_DEPTH, mode=Mode.SUBTRACT)


with BuildPart() as body_10:
    # Mirror2: mirrored copy
    add(body_8.part.mirror(Plane.XY))


with BuildPart() as body_11:
    # Sketch15 → Boss-Extrude12 (new body)
    with BuildSketch(Plane.XZ.offset(-1)):
        with Locations(Location((0, 0, 0), (0, 0, 90))):
            Circle(SKETCH15_R)
        with Locations(Location((0, 0, 0), (0, 0, 90))):
            Circle(SKETCH15_R_2, mode=Mode.SUBTRACT)
    extrude(amount=BOSS_EXTRUDE12_DEPTH)


with BuildPart() as body_9_2:
    add(body_9_1.part)

    # Combine1: union body 11, body 5
    add(body_11.part)
    add(body_5.part)


with BuildPart() as body_10_2:
    # Sketch21 → Boss-Extrude13 (new body)
    with BuildSketch(Plane(origin=(0, 15, 0), x_dir=(1, 0, 0), z_dir=(0, 1, 0))):
        with Locations(Location((0, 0, 0), (0, 0, 270))):
            Circle(SKETCH21_R)
        with Locations(Location((0, 0, 0), (0, 0, 270))):
            Circle(SKETCH21_R_2, mode=Mode.SUBTRACT)
    extrude(amount=BOSS_EXTRUDE13_DEPTH)


with BuildPart() as cut_extrude10_tool:
    # Sketch29 → Cut-Extrude10 (new, through all)
    with BuildSketch(Plane(origin=(0, 8, 0), x_dir=(1, 0, 0), z_dir=(0, 1, 0))):
        with Locations((-45, 0)):
            Rectangle(SKETCH29_W, SKETCH29_H)
    extrude(amount=-CUT_EXTRUDE10_DEPTH)


with BuildPart() as body_2_5:
    add(body_2_4.part)

    # Cut-Extrude10: cut by cut_extrude10_tool
    add(cut_extrude10_tool.part, mode=Mode.SUBTRACT)


with BuildPart() as body_4_3:
    add(body_4_2.part)

    # Cut-Extrude10: cut by cut_extrude10_tool
    add(cut_extrude10_tool.part, mode=Mode.SUBTRACT)


with BuildPart() as cut_extrude12_tool:
    # Sketch31 → Cut-Extrude12 (new, through all)
    with BuildSketch(Plane(origin=(0, 15, 0), x_dir=(1, 0, 0), z_dir=(0, 1, 0))):
        with Locations((-39.25, 0)):
            Rectangle(SKETCH31_W, SKETCH31_H)
    extrude(amount=-CUT_EXTRUDE12_DEPTH)


with BuildPart() as body_2_6:
    add(body_2_5.part)

    # Cut-Extrude12: cut by cut_extrude12_tool
    add(cut_extrude12_tool.part, mode=Mode.SUBTRACT)


with BuildPart() as body_4_4:
    add(body_4_3.part)

    # Cut-Extrude12: cut by cut_extrude12_tool
    add(cut_extrude12_tool.part, mode=Mode.SUBTRACT)


with BuildPart() as body_11_2:
    # Sketch32 → Boss-Extrude17 (new, two sides: drawn at the far end of the back side and taken through both)
    with BuildSketch(Plane(origin=(0, 15, 0), x_dir=(1, 0, 0), z_dir=(0, 1, 0)).offset(-BOSS_EXTRUDE17_DEPTH_BACK)):
        with Locations((-29.25, 0)):
            Rectangle(SKETCH32_W, SKETCH32_H)
        with Locations(Location((-35, 5, 0), (0, 0, 270))):
            Circle(SKETCH32_R, mode=Mode.SUBTRACT)
        with Locations(Location((-25, -5, 0), (0, 0, 270))):
            Circle(SKETCH32_R, mode=Mode.SUBTRACT)
        with Locations(Location((-25, 5, 0), (0, 0, 270))):
            Circle(SKETCH32_R, mode=Mode.SUBTRACT)
        with Locations(Location((-35, -5, 0), (0, 0, 270))):
            Circle(SKETCH32_R, mode=Mode.SUBTRACT)
    extrude(amount=BOSS_EXTRUDE17_DEPTH + BOSS_EXTRUDE17_DEPTH_BACK)


solid = Compound([part.part, body_3_2.part, body_6.part, body_7.part, body_8.part, body_10.part, body_9_2.part, body_10_2.part, body_2_6.part, body_4_4.part, body_11_2.part])
